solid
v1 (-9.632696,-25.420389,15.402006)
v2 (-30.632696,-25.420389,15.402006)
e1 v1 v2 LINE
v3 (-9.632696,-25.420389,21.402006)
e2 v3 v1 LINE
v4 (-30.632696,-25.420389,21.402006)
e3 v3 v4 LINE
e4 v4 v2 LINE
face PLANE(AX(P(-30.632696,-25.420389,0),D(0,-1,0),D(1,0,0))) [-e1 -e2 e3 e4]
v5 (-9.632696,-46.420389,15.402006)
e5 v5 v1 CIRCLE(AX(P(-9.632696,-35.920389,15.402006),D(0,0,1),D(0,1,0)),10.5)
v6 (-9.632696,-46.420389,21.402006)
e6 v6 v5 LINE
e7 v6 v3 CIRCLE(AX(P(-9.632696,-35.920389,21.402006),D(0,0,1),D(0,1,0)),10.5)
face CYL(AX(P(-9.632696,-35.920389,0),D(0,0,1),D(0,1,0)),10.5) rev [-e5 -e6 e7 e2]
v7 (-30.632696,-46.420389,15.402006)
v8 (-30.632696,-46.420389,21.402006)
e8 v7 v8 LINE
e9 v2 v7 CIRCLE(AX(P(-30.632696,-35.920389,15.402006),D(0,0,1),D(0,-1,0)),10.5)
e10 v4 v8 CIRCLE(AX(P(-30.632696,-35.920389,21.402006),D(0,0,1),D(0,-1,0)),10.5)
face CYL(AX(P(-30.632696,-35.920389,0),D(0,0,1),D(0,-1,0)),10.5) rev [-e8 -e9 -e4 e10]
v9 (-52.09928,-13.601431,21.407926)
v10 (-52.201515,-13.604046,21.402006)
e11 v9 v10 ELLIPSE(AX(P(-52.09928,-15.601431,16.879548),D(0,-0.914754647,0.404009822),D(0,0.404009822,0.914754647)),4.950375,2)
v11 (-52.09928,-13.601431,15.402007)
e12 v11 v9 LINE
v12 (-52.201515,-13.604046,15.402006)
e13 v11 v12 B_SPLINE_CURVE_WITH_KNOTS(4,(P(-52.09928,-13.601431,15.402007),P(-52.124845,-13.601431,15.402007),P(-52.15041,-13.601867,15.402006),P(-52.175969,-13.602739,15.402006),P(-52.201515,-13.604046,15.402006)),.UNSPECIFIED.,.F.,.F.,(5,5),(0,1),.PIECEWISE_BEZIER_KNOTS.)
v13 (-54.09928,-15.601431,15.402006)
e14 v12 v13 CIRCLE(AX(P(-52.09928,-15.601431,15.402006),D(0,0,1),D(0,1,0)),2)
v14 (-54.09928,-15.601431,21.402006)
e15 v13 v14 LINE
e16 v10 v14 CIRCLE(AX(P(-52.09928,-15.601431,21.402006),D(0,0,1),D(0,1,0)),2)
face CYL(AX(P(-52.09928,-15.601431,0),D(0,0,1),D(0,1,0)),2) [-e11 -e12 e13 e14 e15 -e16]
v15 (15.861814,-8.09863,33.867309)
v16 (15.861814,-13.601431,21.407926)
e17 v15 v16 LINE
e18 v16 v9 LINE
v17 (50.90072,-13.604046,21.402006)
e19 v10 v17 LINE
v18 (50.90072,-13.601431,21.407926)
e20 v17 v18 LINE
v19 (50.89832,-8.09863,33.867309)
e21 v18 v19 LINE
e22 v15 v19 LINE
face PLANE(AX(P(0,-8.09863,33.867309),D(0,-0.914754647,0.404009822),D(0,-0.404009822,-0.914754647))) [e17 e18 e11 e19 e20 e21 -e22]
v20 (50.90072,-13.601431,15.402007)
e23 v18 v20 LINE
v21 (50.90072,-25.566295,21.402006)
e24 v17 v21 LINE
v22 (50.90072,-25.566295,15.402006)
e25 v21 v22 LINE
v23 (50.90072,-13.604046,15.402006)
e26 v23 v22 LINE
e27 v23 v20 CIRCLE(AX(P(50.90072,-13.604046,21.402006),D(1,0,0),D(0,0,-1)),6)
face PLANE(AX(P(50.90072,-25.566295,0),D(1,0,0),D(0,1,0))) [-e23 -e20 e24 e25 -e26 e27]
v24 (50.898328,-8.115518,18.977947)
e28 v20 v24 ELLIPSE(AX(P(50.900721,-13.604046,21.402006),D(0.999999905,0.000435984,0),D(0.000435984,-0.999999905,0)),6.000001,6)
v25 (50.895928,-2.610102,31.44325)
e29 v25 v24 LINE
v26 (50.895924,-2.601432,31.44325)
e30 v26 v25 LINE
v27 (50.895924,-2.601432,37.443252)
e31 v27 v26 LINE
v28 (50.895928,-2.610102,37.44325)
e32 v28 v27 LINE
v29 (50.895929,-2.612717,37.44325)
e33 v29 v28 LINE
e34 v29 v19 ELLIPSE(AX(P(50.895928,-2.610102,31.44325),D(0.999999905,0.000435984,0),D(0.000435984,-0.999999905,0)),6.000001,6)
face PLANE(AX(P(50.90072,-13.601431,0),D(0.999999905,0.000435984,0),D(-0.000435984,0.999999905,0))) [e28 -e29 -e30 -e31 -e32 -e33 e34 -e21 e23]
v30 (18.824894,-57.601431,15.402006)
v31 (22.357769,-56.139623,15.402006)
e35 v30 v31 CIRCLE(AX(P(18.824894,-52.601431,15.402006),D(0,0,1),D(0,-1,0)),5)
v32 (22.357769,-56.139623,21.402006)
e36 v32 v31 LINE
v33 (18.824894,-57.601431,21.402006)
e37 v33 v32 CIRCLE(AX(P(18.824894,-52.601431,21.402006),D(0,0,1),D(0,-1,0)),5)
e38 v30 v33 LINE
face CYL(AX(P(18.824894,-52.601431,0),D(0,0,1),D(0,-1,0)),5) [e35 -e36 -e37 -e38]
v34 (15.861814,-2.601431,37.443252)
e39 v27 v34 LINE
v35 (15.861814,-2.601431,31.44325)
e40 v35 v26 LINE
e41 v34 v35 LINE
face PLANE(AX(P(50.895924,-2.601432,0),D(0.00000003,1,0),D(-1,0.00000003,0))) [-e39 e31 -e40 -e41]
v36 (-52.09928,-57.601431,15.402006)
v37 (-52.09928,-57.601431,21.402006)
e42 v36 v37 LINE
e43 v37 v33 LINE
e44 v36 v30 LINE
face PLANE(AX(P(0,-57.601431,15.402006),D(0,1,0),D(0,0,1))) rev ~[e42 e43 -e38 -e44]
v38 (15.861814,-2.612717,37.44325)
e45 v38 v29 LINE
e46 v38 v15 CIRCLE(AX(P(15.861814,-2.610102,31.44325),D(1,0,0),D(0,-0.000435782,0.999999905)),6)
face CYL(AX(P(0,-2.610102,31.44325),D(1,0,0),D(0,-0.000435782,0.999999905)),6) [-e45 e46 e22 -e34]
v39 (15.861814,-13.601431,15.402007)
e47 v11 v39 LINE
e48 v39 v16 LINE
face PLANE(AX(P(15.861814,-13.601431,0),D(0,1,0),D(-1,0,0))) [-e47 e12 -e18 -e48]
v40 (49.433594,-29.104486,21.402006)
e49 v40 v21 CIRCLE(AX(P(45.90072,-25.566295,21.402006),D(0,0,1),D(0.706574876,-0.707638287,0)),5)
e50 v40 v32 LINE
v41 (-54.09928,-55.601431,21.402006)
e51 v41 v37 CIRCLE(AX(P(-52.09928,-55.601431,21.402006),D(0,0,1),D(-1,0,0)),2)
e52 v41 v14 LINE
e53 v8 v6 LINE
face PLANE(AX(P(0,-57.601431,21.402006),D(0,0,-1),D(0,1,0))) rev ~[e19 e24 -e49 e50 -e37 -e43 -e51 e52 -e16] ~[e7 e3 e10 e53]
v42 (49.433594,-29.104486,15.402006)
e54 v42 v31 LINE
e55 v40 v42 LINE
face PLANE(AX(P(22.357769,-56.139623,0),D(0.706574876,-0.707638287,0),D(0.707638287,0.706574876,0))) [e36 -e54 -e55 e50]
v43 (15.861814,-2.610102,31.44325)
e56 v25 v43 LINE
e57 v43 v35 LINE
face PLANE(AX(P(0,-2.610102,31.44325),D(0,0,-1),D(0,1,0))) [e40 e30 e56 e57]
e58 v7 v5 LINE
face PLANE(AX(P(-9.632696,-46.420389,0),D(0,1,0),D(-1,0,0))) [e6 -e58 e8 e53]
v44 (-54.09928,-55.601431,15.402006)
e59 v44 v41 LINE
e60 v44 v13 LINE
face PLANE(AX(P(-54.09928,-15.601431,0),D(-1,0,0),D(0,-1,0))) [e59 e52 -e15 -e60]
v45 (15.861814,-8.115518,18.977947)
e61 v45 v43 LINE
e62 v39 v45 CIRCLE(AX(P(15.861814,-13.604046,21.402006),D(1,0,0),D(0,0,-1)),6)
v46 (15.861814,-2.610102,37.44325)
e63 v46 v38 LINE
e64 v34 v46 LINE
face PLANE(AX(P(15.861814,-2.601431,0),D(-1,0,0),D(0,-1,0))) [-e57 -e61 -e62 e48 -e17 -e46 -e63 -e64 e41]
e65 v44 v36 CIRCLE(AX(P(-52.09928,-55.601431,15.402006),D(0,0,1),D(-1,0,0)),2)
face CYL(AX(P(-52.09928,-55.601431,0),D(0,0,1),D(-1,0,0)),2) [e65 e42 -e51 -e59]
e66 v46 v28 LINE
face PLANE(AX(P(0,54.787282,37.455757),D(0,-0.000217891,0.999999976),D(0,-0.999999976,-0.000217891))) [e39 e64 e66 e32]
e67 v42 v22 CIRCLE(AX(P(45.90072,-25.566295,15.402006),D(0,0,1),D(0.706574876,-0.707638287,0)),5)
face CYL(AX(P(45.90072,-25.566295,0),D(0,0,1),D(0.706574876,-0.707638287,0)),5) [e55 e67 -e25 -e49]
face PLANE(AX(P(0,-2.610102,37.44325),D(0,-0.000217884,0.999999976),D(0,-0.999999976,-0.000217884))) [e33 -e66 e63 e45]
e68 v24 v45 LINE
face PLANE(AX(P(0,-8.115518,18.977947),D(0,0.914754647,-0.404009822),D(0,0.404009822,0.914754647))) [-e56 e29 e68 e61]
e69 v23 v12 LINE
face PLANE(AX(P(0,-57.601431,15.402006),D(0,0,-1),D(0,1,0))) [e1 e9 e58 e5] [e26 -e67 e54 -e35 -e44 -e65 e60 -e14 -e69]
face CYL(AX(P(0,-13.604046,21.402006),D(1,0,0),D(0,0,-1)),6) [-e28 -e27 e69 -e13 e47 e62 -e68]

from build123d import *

# Parameters (mm, degrees)
F1_DEPTH = 50
F2_W     = 43.9973853057
F2_H     = 6
F3_DEPTH = 125


# Not quite as in the source:
# - ends of sketch curves that miss each other by under 0.0002 mm in the source are joined
# - a feature names something its author has since deleted; it is built from what else it names


with BuildPart() as f1:
    # F0 (on Top) → F1 (new body, symmetric)
    with BuildSketch(Plane.XY):
        Polygon((15.8618143265, -2.6014313847), (15.8618143265, -13.6014313847), (50.9007196128, -13.6014313847), (50.8959237908, -2.6014324301), align=None)
        with BuildLine():
            Line((15.8618143265, -13.6014313847), (-52.0992803872, -13.6014313847))
            ThreePointArc((-52.0992803872, -13.6014313847), (-53.5134939495, -14.1872178223), (-54.0992803872, -15.6014313847))
            Line((-54.0992803872, -15.6014313847), (-54.0992803872, -55.6014313847))
            ThreePointArc((-54.0992803872, -55.6014313847), (-53.5134939495, -57.0156449471), (-52.0992803872, -57.6014313847))
            Line((-52.0992803872, -57.6014313847), (18.8248942664, -57.6014313847))
            ThreePointArc((18.8248942664, -57.6014313847), (20.7365745268, -57.2215481129), (22.3577686464, -56.1396228175))
            Line((22.3577686464, -56.1396228175), (49.4335939928, -29.1044859403))
            ThreePointArc((49.4335939928, -29.1044859403), (50.5193975568, -27.4814483002), (50.9007196128, -25.5662945075))
            Line((50.9007196128, -25.5662945075), (50.9007196128, -13.6014313847))
            Line((50.9007196128, -13.6014313847), (15.8618143265, -13.6014313847))
        make_face()
        with BuildLine():
            ThreePointArc((-30.6326959729, -46.4203889966), (-41.1326959729, -35.9203889966), (-30.6326959729, -25.4203889966))
            Line((-30.6326959729, -25.4203889966), (-9.6326959729, -25.4203889966))
            ThreePointArc((-9.6326959729, -25.4203889966), (0.8673040271, -35.9203889966), (-9.6326959729, -46.4203889966))
            Line((-9.6326959729, -46.4203889966), (-30.6326959729, -46.4203889966))
        make_face(mode=Mode.SUBTRACT)
    extrude(amount=F1_DEPTH, both=True)


with BuildPart() as f3:
    # F2 (on Right) → F3 (new body, symmetric)
    with BuildSketch(Plane.YZ):
        Polygon((-2.610102063, 37.4432504177), (-2.610102063, 31.4432504177), (54.789897937, 31.4432504177), (54.7872818802, 37.4557568013), align=None)
        with BuildLine():
            Line((-8.1155181983, 18.9779470539), (-2.610102063, 31.4432504177))
            Line((-2.610102063, 31.4432504177), (-2.6127167571, 37.443249848))
            ThreePointArc((-2.6127167571, 37.443249848), (-5.8865329423, 36.4696806314), (-8.0986299437, 33.8673093492))
            Line((-8.0986299437, 33.8673093492), (-13.6040460789, 21.4020059854))
            Line((-13.6040460789, 21.4020059854), (-13.6040460789, 15.4020059854))
            ThreePointArc((-13.6040460789, 15.4020059854), (-10.3287104922, 16.3748619856), (-8.1155181983, 18.9779470539))
        make_face()
        Polygon((-2.6127167571, 37.443249848), (-2.610102063, 31.4432504177), (-2.610102063, 37.4432504177), align=None)
        with Locations((-35.6027387318, 18.4020059854)):
            Rectangle(F2_W, F2_H)
    extrude(amount=F3_DEPTH, both=True)

    # F4: intersect F1
    add(f1.part, mode=Mode.INTERSECT)


solid = f3.part
